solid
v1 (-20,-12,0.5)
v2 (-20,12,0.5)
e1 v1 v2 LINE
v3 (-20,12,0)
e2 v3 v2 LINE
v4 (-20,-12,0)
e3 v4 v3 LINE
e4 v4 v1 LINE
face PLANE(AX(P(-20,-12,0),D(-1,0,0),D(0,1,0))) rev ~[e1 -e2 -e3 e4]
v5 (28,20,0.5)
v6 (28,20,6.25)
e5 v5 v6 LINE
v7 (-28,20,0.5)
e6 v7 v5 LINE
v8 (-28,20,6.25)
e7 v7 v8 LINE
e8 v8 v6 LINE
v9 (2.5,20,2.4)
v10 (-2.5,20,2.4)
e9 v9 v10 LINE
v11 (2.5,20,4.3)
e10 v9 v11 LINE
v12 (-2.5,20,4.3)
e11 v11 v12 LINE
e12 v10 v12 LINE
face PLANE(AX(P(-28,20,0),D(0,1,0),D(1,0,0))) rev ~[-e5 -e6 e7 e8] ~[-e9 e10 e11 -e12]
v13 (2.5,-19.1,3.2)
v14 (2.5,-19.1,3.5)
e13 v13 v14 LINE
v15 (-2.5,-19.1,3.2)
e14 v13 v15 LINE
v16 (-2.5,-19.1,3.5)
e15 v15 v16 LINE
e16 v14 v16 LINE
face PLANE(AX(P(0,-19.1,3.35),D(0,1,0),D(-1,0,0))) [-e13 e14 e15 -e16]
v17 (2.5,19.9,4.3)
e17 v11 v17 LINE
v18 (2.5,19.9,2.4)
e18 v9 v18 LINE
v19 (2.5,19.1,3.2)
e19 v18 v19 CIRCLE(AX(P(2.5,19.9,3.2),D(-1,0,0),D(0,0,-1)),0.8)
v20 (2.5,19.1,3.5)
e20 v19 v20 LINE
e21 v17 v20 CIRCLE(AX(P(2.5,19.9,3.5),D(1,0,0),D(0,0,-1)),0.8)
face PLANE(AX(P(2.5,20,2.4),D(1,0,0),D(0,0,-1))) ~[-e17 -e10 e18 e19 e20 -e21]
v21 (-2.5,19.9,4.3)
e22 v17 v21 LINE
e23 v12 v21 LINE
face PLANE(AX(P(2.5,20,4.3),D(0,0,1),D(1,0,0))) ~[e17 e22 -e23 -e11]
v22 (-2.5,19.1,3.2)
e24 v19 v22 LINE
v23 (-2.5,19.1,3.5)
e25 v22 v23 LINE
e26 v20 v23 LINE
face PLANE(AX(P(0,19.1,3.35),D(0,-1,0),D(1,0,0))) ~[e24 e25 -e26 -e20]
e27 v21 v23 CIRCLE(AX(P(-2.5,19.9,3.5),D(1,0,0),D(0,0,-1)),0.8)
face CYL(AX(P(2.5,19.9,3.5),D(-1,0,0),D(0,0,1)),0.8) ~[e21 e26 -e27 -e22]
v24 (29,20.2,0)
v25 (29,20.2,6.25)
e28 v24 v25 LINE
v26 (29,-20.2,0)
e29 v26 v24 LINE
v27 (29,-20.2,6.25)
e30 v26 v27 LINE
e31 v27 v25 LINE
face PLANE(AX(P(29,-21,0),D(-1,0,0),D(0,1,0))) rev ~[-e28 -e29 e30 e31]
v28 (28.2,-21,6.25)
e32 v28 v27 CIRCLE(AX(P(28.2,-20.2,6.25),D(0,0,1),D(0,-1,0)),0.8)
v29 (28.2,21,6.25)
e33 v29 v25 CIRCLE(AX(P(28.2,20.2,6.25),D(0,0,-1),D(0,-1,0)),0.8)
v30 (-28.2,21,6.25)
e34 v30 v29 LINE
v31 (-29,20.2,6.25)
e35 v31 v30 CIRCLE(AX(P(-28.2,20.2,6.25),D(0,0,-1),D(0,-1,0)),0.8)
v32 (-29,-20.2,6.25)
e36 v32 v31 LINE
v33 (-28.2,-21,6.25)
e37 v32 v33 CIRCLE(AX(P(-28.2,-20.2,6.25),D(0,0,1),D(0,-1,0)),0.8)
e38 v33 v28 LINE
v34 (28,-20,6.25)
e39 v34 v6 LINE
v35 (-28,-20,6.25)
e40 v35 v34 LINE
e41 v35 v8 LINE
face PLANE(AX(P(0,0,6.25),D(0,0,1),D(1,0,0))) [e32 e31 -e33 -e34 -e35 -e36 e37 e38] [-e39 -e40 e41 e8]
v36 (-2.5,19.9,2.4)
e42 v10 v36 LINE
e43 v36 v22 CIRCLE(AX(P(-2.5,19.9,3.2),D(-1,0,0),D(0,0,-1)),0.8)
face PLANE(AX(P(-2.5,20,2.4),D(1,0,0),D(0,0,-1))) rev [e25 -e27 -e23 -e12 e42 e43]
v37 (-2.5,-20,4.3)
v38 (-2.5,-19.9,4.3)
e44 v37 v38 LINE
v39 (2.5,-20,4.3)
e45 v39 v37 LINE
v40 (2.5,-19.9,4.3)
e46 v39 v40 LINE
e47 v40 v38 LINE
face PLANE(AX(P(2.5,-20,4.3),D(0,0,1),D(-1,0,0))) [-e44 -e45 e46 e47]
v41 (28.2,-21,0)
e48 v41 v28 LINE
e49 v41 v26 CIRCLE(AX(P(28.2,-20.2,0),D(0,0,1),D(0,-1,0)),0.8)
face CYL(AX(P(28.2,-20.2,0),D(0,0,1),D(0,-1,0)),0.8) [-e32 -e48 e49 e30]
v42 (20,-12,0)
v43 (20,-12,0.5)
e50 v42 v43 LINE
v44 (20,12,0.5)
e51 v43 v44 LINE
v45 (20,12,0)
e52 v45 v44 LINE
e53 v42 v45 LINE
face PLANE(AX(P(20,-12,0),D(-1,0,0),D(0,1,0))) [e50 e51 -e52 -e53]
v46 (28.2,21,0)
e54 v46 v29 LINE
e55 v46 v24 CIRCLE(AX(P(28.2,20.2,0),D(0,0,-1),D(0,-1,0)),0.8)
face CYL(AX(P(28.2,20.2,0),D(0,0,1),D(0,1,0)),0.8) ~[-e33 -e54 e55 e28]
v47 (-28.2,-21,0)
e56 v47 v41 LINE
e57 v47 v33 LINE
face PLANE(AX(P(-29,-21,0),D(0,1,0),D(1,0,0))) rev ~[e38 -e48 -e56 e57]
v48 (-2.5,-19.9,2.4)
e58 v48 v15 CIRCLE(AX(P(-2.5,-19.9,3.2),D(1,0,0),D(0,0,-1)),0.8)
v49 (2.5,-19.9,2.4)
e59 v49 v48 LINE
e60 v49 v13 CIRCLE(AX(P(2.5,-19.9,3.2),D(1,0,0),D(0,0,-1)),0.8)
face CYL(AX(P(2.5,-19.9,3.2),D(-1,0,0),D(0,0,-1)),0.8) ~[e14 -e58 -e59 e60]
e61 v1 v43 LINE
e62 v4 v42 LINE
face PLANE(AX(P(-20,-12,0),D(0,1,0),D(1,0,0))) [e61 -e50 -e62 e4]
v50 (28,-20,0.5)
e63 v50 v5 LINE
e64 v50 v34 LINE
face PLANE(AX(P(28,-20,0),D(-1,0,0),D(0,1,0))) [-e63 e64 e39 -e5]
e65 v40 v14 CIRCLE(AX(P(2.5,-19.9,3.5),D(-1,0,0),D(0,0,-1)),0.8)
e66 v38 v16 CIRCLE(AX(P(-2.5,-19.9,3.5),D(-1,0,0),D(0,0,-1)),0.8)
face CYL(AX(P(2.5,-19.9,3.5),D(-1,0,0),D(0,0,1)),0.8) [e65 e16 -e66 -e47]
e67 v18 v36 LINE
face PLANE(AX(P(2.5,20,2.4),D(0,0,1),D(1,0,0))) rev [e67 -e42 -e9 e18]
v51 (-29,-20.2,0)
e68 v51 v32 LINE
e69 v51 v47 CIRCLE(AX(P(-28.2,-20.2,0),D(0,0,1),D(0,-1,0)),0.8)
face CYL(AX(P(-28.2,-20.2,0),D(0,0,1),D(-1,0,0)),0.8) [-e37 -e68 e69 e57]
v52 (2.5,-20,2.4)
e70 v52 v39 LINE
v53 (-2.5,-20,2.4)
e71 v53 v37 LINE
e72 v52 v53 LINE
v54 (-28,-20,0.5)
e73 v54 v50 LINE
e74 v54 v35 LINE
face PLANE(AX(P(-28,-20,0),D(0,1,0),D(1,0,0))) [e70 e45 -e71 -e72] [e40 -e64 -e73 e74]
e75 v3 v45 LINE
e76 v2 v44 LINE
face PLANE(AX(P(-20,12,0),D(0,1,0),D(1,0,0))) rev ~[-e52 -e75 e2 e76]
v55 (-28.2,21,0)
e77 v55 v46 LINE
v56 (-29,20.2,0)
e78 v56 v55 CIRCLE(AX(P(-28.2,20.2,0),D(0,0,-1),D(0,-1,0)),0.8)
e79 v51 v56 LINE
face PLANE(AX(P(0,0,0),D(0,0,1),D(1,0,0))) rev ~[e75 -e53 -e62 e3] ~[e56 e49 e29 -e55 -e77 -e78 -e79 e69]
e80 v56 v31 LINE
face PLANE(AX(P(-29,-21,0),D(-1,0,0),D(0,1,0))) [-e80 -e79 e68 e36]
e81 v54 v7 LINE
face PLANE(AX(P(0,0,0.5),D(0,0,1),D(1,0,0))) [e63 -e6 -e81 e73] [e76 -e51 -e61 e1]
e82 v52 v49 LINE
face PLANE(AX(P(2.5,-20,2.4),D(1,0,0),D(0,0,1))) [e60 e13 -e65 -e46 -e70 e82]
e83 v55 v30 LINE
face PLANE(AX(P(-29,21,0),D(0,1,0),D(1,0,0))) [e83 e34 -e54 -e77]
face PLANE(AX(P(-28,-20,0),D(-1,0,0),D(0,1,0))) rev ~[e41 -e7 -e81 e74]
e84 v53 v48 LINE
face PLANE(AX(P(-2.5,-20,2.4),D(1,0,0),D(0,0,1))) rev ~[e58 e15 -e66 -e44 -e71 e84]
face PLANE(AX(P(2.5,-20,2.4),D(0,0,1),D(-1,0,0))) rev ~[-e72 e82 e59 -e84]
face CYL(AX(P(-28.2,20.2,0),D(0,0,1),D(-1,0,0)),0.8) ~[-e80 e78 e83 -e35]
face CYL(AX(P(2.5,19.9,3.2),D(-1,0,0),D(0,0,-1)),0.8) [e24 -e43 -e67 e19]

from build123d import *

# Parameters (mm, degrees)
F0_W     = 56
F0_H     = 40
F0_W_2   = 40
F0_H_2   = 24
F1_DEPTH = 0.5
F0_W_3   = 58
F0_H_3   = 42
F2_DEPTH = 6.25
F3_W     = 5
F3_H     = 1.9
F4_DEPTH = 0.9
F5_R     = 0.8


# Not quite as in the source:
# - two fillets or chamfers of one size are made in one step
# - a pattern or mirror of a feature is missing from the dataset's text; its kind, count and spacing are read off the source's solid


with BuildPart() as f1:
    # F0 (on Top) → F1 (new body)
    with BuildSketch(Plane.XY):
        Rectangle(F0_W, F0_H)
        Rectangle(F0_W_2, F0_H_2, mode=Mode.SUBTRACT)
    extrude(amount=F1_DEPTH)

    # F0 (on Top) → F2 (join)
    with BuildSketch(Plane.XY):
        Rectangle(F0_W_3, F0_H_3)
        Rectangle(F0_W, F0_H, mode=Mode.SUBTRACT)
    extrude(amount=F2_DEPTH)

    # F3 (on face) → F4 (join)
    with BuildSketch(Plane(origin=(0, -20, 0), x_dir=(-1, 0, 0), z_dir=(0, 1, 0))):
        with Locations((0, 3.35)):
            Rectangle(F3_W, F3_H)
    f4 = extrude(amount=F4_DEPTH)

    # F4_copies: F4 across plane
    add(f4.mirror(Plane.ZX))

    # F5
    f5_edges = [f1.edges().sort_by_distance(p)[0] for p in [
        (0, -19.1, 4.3),
        (0, -19.1, 2.4),
        (29, 21, 3.125),
        (-29, 21, 3.125),
        (-29, -21, 3.125),
        (29, -21, 3.125),
        (0, 19.1, 4.3),
        (0, 19.1, 2.4),
    ]]
    fillet(f5_edges, radius=F5_R)


solid = f1.part
